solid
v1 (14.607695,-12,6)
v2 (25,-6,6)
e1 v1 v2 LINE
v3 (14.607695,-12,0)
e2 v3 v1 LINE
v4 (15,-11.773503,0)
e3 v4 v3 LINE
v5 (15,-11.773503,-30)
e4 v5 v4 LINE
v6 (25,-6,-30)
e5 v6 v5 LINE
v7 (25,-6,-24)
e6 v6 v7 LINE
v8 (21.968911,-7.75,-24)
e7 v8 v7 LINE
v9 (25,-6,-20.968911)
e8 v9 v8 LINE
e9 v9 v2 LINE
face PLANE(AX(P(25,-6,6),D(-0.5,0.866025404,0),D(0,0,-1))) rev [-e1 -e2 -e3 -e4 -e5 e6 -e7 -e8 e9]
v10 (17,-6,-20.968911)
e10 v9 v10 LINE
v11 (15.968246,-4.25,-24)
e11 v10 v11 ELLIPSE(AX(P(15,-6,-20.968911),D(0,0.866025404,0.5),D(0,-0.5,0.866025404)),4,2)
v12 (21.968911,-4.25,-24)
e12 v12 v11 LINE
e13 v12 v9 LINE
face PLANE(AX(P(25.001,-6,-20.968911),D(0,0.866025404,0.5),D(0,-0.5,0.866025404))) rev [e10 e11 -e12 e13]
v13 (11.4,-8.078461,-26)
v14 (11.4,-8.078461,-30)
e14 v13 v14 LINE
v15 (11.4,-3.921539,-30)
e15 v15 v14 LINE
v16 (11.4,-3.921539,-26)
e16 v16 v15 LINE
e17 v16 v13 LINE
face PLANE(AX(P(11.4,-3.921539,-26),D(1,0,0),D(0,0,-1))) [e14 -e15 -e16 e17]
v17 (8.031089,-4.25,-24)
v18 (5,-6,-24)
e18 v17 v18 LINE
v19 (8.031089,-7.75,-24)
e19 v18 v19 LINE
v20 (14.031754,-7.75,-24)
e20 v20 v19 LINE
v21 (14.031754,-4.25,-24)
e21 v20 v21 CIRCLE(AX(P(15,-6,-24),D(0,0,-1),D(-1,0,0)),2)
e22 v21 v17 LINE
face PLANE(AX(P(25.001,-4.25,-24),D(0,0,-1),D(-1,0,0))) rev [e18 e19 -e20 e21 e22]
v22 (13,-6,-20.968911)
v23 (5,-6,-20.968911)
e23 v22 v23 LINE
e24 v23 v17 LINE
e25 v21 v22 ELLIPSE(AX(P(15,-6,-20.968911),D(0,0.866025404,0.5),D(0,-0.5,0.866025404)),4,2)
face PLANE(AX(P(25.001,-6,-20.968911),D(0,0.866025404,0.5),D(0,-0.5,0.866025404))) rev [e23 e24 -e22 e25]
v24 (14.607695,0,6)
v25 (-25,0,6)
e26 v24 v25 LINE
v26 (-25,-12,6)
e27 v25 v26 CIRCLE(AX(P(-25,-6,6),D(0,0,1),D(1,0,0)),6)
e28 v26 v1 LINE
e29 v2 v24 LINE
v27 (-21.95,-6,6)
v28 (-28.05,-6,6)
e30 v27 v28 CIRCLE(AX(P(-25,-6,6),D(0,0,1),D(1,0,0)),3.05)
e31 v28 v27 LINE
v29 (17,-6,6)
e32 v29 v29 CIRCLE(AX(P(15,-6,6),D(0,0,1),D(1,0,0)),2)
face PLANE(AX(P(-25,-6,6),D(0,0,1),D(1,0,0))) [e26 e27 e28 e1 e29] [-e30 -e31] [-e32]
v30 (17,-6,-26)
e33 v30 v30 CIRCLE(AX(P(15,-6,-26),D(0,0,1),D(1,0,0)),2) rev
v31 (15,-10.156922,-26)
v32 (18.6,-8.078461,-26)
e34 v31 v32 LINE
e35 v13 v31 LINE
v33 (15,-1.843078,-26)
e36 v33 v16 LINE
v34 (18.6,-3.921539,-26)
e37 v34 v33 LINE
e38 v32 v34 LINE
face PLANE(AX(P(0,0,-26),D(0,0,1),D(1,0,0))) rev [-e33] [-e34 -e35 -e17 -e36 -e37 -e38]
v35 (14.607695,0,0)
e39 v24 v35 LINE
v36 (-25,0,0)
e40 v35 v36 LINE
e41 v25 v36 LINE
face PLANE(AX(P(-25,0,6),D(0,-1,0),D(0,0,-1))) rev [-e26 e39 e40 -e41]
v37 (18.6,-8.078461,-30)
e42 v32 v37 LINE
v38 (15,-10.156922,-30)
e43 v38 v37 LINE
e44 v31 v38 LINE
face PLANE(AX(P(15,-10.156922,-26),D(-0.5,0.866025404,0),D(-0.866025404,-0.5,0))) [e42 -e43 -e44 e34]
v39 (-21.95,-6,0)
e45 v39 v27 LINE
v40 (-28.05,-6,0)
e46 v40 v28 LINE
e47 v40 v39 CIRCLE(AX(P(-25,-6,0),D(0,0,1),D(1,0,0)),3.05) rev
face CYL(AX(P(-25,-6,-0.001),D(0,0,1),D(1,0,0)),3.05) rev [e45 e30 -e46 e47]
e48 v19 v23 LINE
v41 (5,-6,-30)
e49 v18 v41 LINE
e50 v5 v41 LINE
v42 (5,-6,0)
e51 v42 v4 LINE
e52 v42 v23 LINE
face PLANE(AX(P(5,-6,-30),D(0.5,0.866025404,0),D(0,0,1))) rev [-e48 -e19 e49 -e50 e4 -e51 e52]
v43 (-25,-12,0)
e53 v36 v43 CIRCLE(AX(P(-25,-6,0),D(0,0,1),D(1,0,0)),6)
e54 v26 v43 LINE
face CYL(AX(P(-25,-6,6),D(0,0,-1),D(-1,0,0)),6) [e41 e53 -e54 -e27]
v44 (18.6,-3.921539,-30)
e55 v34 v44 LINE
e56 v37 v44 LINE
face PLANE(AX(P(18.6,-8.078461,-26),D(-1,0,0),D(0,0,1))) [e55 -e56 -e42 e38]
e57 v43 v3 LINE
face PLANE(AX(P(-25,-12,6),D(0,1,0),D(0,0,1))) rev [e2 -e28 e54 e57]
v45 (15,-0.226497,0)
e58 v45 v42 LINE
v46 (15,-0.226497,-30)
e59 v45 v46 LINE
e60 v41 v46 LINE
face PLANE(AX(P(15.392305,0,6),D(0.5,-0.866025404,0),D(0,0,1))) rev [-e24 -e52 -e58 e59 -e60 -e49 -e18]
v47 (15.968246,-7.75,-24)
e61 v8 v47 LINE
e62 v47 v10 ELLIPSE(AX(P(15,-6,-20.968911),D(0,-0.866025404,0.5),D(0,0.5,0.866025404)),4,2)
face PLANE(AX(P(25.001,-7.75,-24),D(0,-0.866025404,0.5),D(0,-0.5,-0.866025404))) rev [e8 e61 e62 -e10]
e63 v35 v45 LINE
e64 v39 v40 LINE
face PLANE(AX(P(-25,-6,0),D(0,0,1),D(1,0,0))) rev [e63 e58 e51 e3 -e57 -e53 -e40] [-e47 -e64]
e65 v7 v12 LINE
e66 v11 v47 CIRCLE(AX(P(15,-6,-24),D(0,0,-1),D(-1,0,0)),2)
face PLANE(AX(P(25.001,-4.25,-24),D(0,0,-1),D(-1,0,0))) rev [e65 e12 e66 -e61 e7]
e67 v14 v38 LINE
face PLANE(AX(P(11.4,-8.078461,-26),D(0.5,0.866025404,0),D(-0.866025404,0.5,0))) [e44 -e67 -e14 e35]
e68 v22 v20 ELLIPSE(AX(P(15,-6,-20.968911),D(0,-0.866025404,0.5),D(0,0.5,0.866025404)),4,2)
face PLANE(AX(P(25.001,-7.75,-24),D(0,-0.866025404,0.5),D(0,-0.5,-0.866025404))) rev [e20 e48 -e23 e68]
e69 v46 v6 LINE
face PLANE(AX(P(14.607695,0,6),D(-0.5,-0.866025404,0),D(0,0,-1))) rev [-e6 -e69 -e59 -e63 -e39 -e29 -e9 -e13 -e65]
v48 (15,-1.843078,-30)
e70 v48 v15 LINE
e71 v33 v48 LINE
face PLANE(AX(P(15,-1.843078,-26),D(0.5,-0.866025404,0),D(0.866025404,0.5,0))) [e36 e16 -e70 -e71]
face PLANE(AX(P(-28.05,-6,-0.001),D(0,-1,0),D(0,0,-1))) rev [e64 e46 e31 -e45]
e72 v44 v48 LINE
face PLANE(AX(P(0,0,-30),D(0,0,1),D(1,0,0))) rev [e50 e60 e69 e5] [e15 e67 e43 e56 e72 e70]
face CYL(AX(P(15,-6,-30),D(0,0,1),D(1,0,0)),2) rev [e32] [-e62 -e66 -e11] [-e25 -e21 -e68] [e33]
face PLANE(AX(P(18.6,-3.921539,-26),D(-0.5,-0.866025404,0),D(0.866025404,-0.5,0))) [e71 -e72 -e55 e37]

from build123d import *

# Parameters (mm, degrees)
BOSS_EXTRUDE1_DEPTH = 6
CUT_EXTRUDE1_REACH  = 35.779
BOSS_EXTRUDE2_DEPTH = 30
CUT_EXTRUDE2_REACH  = 50.374
SKETCH5_R           = 2
CUT_EXTRUDE3_DEPTH  = 50
CHAMFER1_SIZE       = 10.392304845
CHAMFER1_SIZE_2     = 6
CHAMFER2_SIZE       = 10.392304845
CHAMFER2_SIZE_2     = 6
CUT_EXTRUDE4_DEPTH  = 4


with BuildPart() as part:
    # Sketch1 → Boss-Extrude1 (new body)
    with BuildSketch(Plane.XY):
        with BuildLine():
            Line((-25, 0), (0, 0))
            Line((0, 0), (25, 0))
            Line((25, 0), (25, -12))
            Line((25, -12), (-25, -12))
            ThreePointArc((-25, -12), (-31, -6), (-25, 0))
        make_face()
    extrude(amount=BOSS_EXTRUDE1_DEPTH)

    # Sketch2 → Cut-Extrude1 (cut, up to next)
    with BuildSketch(Plane.XY.offset(6), mode=Mode.PRIVATE) as cut_extrude1_sk1:
        with BuildLine():
            Line((-28.05, -6), (-21.95, -6))
            ThreePointArc((-21.95, -6), (-25, -2.95), (-28.05, -6))
        make_face()
    cut_extrude1_tool1 = extrude(cut_extrude1_sk1.sketch, amount=-CUT_EXTRUDE1_REACH, mode=Mode.PRIVATE) & part.part
    add(cut_extrude1_tool1.solids().sort_by_distance((-25, -4.70554, 6))[0], mode=Mode.SUBTRACT)

    # Sketch3 → Boss-Extrude2 (add)
    with BuildSketch(Plane(origin=(0, 0, 0), x_dir=(-1, 0, 0), z_dir=(0, 0, -1))):
        Polygon((-25, 0), (-5, 0), (-5, -6), (-5, -12), (-25, -12), align=None)
    extrude(amount=BOSS_EXTRUDE2_DEPTH)

    # Sketch4 → Cut-Extrude2 (cut, up to next)
    with BuildSketch(Plane.ZY.offset(-5), mode=Mode.PRIVATE) as cut_extrude2_sk1:
        Polygon((-20.968911087, -6), (-24, -4.25), (-24, -7.75), align=None)
    cut_extrude2_tool1 = extrude(cut_extrude2_sk1.sketch, amount=-CUT_EXTRUDE2_REACH, mode=Mode.PRIVATE) & part.part
    add(cut_extrude2_tool1.solids().sort_by_distance((5, -6, -22.989637))[0], mode=Mode.SUBTRACT)

    # Sketch5 → Cut-Extrude3 (cut, through all)
    with BuildSketch(Plane.XY.offset(6)):
        with Locations((15, -6)):
            Circle(SKETCH5_R)
    extrude(amount=-CUT_EXTRUDE3_DEPTH, mode=Mode.SUBTRACT)

    # Chamfer1
    # the kernel refuses this chamfer: 10.392304845, 6 mm, written as the material it takes off along each edge
    with BuildSketch(Plane(origin=(5, 0, 0), x_dir=(0.9998132206222079, 0.019326765612700622, 0), z_dir=(0, 0, -1))) as chamfer1_piece_1:
        Polygon((CHAMFER1_SIZE * 0.999813220662, CHAMFER1_SIZE * 0.0193267656135), (-CHAMFER1_SIZE_2 * 0.0193267656127, CHAMFER1_SIZE_2 * 0.999813220622), (0, 0), align=None)
    extrude(amount=56.885783824, mode=Mode.SUBTRACT)
    with BuildSketch(Plane(origin=(5, -12, 0), x_dir=(-0.057893862402671484, 0.9983227437537926, 0), z_dir=(0, 0, -1))) as chamfer1_piece_2:
        Polygon((CHAMFER1_SIZE_2 * 0.998322743754, CHAMFER1_SIZE_2 * 0.0578938624027), (-CHAMFER1_SIZE * 0.057893862405, CHAMFER1_SIZE * 0.998322743793), (0, 0), align=None)
    extrude(amount=56.885783824, mode=Mode.SUBTRACT)

    # Chamfer2
    # the kernel refuses this chamfer: 10.392304845, 6 mm, written as the material it takes off along each edge
    with BuildSketch(Plane(origin=(25, -12, 32.885783824), x_dir=(-0.9998132206222079, -0.01932676561270069, 0), z_dir=(0, 0, -1))) as chamfer2_piece_1:
        Polygon((CHAMFER2_SIZE * 0.999813220662, CHAMFER2_SIZE * 0.0193267656135), (-CHAMFER2_SIZE_2 * 0.0193267656127, CHAMFER2_SIZE_2 * 0.999813220622), (0, 0), align=None)
    extrude(amount=89.771567647, mode=Mode.SUBTRACT)
    with BuildSketch(Plane(origin=(25, 0, 32.885783824), x_dir=(-0.9998132206222079, 0.019326765612700622, 0), z_dir=(0, 0, -1))) as chamfer2_piece_2:
        Polygon((CHAMFER2_SIZE * 0.999813220662, -CHAMFER2_SIZE * 0.0193267656135), (-CHAMFER2_SIZE_2 * 0.0193267656127, -CHAMFER2_SIZE_2 * 0.999813220622), (0, 0), align=None)
    extrude(amount=89.771567647, mode=Mode.SUBTRACT)

    # Sketch6 → Cut-Extrude4 (cut)
    with BuildSketch(Plane.XY.offset(-30)):
        Polygon((11.4, -3.921539031), (11.4, -8.078460969), (15, -10.156921938), (18.6, -8.078460969), (18.6, -3.921539031), (15, -1.843078062), align=None)
    extrude(amount=CUT_EXTRUDE4_DEPTH, mode=Mode.SUBTRACT)


solid = part.part
